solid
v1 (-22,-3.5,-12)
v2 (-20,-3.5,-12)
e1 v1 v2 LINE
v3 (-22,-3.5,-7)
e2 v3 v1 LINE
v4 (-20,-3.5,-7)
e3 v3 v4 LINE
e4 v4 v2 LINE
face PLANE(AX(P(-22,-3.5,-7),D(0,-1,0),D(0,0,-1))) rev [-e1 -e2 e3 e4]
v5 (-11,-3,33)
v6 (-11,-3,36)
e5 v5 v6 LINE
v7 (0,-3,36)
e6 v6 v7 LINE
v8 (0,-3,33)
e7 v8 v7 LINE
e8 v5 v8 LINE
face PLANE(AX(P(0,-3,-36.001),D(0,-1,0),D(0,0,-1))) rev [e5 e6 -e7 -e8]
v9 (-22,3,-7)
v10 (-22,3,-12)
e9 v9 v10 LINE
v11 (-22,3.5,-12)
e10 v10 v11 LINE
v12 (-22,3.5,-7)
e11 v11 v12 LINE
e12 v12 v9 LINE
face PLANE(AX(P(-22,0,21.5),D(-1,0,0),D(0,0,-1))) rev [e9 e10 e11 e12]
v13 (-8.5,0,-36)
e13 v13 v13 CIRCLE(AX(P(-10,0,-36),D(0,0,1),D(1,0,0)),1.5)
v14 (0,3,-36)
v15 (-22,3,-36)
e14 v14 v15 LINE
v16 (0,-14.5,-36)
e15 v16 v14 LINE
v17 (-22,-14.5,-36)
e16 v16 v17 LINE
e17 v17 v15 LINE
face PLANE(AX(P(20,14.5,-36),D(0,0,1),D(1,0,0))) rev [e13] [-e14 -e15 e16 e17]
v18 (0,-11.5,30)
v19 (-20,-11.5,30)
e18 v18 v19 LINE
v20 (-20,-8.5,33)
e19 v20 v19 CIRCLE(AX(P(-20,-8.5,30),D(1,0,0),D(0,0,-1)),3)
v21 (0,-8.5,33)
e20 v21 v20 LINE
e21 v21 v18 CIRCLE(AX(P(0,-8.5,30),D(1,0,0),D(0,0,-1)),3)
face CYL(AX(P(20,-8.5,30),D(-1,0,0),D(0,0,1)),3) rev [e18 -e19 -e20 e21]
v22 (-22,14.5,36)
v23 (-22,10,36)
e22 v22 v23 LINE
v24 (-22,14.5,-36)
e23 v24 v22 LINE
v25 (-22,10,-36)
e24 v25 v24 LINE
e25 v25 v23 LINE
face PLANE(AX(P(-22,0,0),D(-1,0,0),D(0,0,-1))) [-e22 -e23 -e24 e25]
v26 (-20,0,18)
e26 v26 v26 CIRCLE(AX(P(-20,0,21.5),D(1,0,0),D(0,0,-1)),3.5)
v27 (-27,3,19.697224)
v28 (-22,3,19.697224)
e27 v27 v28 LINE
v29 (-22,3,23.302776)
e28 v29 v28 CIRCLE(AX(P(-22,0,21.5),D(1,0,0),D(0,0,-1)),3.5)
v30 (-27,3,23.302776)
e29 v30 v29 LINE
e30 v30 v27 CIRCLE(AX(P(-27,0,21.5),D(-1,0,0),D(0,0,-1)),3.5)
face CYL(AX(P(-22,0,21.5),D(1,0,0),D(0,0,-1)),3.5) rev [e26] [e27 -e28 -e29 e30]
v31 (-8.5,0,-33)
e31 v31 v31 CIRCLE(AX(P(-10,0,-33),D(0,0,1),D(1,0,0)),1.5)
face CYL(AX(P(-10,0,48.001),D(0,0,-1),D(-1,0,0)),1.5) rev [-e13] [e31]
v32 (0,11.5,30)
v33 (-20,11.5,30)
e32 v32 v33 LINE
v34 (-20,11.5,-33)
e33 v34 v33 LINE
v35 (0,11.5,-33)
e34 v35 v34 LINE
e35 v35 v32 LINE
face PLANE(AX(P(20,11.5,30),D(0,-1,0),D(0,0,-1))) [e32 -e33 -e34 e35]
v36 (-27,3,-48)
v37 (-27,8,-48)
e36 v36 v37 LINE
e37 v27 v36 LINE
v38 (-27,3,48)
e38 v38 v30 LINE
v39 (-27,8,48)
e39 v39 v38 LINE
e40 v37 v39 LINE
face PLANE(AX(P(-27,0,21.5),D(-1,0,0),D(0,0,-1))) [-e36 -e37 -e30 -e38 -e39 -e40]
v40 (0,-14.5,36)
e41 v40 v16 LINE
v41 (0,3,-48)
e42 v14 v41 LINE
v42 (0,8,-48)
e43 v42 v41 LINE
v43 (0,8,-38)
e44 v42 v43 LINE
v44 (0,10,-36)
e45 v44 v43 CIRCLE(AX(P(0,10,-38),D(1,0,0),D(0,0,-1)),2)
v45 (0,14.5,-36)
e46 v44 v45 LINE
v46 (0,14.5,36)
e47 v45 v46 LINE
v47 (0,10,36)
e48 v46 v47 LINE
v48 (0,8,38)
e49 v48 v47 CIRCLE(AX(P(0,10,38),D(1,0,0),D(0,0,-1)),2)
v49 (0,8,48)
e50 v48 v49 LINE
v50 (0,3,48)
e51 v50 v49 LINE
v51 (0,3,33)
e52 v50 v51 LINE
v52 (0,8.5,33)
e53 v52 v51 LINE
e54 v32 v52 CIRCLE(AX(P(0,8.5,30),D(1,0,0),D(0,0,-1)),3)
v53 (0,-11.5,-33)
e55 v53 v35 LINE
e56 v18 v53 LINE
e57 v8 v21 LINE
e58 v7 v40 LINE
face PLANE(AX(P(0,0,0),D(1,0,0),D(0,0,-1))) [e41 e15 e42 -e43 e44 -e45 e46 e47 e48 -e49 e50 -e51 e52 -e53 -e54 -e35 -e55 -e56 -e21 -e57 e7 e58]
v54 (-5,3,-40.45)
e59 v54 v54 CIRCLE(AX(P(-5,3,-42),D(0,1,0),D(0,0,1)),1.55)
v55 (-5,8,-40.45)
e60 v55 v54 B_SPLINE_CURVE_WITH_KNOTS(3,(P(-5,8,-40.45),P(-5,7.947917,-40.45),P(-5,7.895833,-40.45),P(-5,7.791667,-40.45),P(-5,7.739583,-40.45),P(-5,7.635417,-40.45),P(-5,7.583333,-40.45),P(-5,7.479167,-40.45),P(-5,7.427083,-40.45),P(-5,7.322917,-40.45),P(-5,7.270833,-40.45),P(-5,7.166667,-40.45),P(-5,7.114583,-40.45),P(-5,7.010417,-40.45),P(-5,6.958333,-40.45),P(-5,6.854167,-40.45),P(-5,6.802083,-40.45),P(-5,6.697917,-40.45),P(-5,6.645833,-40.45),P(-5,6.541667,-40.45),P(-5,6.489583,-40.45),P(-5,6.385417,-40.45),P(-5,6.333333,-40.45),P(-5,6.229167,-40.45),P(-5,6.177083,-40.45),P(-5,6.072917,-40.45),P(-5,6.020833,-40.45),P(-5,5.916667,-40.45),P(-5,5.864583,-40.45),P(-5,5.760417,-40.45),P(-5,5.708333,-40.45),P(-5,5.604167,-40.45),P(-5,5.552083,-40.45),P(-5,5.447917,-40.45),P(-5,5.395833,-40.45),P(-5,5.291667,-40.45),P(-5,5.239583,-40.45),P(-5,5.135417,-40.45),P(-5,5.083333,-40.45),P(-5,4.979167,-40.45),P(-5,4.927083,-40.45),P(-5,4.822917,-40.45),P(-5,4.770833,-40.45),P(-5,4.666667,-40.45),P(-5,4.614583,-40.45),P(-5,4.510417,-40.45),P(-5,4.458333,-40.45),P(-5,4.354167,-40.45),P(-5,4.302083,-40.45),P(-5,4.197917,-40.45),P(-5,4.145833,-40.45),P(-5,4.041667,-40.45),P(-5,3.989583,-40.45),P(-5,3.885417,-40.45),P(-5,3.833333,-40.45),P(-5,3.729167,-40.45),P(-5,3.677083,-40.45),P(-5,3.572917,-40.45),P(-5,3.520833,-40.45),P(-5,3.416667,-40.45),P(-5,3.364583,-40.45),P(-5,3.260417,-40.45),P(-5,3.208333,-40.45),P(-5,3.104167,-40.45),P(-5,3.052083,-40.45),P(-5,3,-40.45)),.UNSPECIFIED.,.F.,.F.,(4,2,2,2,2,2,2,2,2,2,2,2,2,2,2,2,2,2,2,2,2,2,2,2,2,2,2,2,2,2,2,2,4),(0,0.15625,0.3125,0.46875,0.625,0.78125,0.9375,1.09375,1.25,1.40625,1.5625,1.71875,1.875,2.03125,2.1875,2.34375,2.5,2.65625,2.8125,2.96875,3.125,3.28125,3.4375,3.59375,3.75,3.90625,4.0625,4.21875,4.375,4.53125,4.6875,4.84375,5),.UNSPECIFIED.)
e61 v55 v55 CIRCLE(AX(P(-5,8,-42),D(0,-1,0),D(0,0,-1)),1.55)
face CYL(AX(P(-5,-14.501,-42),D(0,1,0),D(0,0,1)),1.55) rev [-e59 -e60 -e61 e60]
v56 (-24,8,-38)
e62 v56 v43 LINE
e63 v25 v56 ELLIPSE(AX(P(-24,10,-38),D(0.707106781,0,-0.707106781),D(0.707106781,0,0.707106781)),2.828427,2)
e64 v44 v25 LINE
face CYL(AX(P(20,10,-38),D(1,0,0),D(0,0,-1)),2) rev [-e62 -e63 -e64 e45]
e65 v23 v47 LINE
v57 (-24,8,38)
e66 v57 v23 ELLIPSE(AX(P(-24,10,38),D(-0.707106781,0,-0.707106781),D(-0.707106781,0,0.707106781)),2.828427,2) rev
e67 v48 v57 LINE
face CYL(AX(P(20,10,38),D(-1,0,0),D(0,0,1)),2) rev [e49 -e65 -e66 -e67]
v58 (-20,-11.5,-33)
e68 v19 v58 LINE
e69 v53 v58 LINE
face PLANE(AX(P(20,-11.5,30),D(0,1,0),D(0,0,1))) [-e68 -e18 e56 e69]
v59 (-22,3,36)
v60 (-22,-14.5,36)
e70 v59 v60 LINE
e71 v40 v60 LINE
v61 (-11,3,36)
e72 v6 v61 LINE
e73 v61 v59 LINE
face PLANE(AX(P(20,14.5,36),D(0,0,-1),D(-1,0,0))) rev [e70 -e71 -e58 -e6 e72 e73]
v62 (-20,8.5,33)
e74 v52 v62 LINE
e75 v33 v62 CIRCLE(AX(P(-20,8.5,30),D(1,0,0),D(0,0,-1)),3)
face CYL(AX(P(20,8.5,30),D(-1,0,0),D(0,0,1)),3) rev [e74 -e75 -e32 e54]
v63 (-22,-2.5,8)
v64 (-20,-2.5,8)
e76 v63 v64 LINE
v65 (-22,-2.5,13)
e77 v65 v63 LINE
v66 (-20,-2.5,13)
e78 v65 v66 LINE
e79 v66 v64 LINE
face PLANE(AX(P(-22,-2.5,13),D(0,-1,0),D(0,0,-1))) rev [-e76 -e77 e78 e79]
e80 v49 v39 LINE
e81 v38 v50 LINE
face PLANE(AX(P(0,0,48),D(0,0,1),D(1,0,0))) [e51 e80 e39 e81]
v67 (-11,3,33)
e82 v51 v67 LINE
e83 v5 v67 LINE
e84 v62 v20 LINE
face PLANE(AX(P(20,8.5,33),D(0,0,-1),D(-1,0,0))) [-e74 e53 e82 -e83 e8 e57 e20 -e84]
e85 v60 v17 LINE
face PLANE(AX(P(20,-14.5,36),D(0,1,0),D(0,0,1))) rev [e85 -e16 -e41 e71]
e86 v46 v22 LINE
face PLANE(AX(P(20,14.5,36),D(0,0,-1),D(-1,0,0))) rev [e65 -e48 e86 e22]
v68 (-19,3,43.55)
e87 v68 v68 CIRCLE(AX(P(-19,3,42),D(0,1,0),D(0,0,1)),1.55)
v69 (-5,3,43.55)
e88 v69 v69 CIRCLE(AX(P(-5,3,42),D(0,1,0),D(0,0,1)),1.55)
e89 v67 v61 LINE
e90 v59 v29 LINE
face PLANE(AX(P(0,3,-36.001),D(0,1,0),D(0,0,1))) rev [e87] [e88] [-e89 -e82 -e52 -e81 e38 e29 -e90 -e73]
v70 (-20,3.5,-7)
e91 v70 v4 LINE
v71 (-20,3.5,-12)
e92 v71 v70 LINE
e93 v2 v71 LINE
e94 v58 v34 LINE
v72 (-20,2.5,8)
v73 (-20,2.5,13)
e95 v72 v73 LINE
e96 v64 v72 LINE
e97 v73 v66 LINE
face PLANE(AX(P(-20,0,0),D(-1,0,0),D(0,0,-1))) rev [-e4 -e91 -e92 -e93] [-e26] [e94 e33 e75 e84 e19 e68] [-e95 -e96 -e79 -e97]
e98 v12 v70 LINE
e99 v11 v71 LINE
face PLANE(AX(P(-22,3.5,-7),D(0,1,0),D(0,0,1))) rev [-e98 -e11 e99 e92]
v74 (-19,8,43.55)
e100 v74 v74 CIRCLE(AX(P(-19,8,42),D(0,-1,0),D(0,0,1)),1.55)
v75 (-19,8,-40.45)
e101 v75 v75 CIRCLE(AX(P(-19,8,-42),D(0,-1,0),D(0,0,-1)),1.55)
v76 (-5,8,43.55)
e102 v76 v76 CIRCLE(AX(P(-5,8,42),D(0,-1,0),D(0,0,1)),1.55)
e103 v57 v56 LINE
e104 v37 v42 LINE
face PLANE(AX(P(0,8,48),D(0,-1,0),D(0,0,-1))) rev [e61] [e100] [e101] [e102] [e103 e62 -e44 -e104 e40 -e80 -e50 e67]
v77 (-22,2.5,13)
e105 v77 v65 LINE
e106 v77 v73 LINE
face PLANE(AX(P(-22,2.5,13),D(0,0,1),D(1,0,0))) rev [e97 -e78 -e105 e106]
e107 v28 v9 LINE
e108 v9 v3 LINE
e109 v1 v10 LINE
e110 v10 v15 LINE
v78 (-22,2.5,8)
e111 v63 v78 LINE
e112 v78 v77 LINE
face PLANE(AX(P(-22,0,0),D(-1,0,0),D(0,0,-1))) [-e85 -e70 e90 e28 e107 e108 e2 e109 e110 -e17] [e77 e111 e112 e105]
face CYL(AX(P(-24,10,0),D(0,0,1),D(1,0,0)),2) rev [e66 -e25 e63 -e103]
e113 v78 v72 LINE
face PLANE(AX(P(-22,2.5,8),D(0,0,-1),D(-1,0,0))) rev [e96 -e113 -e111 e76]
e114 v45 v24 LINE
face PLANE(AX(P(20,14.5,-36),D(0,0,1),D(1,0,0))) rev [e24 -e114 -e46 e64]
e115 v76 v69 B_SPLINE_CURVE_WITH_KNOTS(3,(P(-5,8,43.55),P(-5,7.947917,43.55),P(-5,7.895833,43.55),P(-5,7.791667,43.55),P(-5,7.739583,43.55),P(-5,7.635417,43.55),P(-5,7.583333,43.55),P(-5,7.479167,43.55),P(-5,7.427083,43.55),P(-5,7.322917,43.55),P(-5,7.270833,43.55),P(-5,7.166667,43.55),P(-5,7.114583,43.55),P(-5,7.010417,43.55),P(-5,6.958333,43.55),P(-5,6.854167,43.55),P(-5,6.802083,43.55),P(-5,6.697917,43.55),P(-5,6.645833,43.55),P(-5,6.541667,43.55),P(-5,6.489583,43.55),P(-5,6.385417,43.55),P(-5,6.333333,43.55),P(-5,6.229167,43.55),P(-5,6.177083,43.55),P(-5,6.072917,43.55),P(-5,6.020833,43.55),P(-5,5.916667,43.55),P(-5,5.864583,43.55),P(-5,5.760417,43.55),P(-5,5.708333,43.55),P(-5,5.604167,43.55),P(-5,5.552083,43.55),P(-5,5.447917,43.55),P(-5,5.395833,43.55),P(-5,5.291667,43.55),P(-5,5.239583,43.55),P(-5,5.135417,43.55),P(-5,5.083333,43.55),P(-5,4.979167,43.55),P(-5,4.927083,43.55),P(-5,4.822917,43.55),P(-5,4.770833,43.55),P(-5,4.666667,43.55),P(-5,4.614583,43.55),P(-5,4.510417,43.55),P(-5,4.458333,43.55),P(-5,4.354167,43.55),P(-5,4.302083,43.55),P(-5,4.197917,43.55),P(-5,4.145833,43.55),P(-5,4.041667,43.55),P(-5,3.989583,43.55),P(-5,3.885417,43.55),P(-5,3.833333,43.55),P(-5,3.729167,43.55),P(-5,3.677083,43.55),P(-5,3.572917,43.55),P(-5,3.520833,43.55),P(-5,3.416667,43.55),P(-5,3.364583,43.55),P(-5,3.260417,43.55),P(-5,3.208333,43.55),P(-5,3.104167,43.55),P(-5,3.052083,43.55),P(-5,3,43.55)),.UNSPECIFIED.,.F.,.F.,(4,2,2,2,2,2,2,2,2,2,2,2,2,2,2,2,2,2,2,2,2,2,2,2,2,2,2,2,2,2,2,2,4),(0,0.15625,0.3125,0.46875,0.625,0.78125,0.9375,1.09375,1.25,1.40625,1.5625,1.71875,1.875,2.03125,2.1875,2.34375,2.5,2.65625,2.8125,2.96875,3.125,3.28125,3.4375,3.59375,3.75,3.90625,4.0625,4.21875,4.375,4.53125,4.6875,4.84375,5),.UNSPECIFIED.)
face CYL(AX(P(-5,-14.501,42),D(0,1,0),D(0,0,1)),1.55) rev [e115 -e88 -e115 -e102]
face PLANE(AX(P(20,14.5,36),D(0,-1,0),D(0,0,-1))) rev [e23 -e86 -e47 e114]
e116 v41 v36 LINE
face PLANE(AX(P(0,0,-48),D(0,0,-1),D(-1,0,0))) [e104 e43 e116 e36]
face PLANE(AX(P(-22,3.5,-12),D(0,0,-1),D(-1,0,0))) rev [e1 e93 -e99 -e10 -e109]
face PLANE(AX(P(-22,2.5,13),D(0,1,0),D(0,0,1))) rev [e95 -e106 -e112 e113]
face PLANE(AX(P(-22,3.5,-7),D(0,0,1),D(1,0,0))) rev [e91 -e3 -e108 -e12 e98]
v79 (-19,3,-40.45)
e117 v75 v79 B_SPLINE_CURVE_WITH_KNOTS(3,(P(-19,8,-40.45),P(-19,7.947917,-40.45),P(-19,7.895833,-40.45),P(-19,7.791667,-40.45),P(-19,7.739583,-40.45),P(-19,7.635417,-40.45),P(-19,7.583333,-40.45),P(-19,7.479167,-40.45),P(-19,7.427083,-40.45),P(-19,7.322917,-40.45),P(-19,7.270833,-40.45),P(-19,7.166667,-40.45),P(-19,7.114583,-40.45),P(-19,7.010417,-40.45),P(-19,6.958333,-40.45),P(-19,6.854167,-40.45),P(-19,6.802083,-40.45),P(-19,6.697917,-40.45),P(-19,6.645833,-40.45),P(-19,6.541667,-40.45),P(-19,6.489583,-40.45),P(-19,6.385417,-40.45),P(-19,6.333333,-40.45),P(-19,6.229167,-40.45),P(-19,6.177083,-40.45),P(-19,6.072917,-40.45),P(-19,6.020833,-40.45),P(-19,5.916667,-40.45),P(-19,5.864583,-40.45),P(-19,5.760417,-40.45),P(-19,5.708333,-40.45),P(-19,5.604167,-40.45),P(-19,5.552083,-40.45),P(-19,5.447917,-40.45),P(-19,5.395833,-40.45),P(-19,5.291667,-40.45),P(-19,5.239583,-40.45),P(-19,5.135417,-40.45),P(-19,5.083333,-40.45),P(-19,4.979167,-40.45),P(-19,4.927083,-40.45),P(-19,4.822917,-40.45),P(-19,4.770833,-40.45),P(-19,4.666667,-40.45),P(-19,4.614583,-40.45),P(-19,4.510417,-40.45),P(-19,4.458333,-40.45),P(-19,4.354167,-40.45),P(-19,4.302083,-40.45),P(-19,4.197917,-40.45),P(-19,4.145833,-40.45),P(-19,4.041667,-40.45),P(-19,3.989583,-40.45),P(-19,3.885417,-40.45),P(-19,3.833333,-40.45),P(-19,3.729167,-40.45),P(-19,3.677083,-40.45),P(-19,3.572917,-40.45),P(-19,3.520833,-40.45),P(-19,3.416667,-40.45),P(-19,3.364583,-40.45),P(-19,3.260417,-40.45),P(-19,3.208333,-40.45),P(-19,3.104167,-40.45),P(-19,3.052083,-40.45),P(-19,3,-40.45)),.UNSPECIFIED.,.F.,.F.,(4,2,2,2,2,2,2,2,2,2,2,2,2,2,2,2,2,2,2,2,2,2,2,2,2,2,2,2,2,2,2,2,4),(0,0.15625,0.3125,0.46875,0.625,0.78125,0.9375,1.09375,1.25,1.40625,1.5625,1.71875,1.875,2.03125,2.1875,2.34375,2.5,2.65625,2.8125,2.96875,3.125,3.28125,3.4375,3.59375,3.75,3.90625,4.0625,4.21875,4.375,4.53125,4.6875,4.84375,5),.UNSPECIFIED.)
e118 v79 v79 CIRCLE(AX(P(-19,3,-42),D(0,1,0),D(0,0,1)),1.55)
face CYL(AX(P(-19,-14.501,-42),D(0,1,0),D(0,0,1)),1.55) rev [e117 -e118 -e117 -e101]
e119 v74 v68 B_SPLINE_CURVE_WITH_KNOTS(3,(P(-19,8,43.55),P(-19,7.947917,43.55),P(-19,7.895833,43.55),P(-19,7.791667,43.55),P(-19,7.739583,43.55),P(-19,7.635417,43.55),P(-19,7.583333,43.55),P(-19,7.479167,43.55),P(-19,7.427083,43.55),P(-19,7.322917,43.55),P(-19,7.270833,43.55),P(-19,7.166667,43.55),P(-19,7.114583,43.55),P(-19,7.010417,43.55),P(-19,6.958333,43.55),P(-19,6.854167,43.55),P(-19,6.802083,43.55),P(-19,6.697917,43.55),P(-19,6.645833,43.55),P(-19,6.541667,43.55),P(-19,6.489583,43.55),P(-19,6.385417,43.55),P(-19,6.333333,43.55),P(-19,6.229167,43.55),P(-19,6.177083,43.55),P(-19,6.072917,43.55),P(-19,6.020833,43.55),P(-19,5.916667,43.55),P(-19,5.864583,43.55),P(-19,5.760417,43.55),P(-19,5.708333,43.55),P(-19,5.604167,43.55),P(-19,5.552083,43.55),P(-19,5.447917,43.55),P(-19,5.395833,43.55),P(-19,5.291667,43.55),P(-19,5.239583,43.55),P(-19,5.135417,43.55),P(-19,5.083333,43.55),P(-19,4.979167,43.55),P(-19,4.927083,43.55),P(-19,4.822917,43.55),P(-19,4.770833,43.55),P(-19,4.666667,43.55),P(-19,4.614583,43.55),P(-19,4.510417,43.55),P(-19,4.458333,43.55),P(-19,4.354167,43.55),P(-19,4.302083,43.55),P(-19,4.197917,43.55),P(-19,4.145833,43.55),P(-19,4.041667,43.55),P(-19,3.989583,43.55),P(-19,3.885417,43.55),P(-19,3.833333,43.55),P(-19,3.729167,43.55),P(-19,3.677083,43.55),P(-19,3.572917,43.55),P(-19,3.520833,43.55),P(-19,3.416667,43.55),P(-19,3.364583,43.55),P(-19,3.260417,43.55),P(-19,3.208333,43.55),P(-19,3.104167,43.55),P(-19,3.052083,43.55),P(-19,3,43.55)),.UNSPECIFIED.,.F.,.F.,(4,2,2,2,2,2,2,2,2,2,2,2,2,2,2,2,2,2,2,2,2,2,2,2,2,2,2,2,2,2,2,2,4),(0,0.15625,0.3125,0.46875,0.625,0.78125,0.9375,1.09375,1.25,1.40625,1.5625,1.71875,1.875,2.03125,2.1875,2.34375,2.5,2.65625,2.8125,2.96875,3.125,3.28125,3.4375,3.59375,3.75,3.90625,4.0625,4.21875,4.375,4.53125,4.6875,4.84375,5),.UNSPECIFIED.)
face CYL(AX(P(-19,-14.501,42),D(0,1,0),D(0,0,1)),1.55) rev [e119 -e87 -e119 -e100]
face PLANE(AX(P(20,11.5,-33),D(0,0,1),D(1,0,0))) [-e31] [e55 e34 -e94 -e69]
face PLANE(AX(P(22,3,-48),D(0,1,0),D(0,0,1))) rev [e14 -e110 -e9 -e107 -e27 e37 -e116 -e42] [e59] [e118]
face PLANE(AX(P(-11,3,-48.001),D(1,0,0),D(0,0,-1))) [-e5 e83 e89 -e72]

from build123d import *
from build123d.topology import SkipClean

# Parameters (mm, degrees)
SKETCH_1_W             = 72
SKETCH_1_H             = 29
EXTRUDE_1_DEPTH        = 20
CUT_EXTRUDE_1_REACH    = 78.12
SKETCH_2_W             = 11
SKETCH_2_H             = 6
CUT_EXTRUDE_2_REACH    = 78.12
SKETCH_3_R             = 1.5
SKETCH_4_W             = 72
SKETCH_4_H             = 29
SKETCH_4_R             = 3.5
SKETCH_4_W_2           = 5
SKETCH_4_H_2           = 5
SKETCH_4_H_3           = 7
EXTRUDE_2_DEPTH        = 2
SKETCH_6_W             = 22
SKETCH_6_H             = 5
EXTRUDE_3_DEPTH        = 12
SKETCH_7_W             = 22
SKETCH_7_H             = 5
EXTRUDE_4_DEPTH        = 12
EXTRUDE_5_DEPTH        = 5
CUT_EXTRUDE_4_REACH    = 61.492
SKETCH_10_R            = 1.55
FILLET_1_R             = 2
FILLET_1_OF_MIRROR_4_R = 2
SKETCH_11_W            = 152.939509244
SKETCH_11_H            = 68.45292135
CUT_EXTRUDE_5_DEPTH    = 27


with BuildPart() as part:
    # 草圖1 → 填料-伸長1 (new body)
    with BuildSketch(Plane(origin=(0, 0, 0), x_dir=(0, 0, -1), z_dir=(1, 0, 0))):
        Rectangle(SKETCH_1_W, SKETCH_1_H)
        with BuildLine():
            Line((-30, 11.5), (33, 11.5))
            Line((33, 11.5), (33, -11.5))
            Line((33, -11.5), (-30, -11.5))
            ThreePointArc((-30, -11.5), (-32.121320344, -10.621320344), (-33, -8.5))
            Line((-33, -8.5), (-33, 8.5))
            ThreePointArc((-33, 8.5), (-32.121320344, 10.621320344), (-30, 11.5))
        make_face(mode=Mode.SUBTRACT)
    extrude_1 = extrude(amount=EXTRUDE_1_DEPTH)

    # 草圖2 → 除料-伸長1 (cut, up to next)
    with BuildSketch(Plane.XY.offset(36), mode=Mode.PRIVATE) as cut_extrude_1_sk1:
        with Locations((5.5, 0)):
            Rectangle(SKETCH_2_W, SKETCH_2_H)
    cut_extrude_1_tool1 = extrude(cut_extrude_1_sk1.sketch, amount=-CUT_EXTRUDE_1_REACH, mode=Mode.PRIVATE) & part.part
    cut_extrude_1 = cut_extrude_1_tool1.solids().sort_by_distance((5.5, 0, 36))[0]
    add(cut_extrude_1, mode=Mode.SUBTRACT)

    # 草圖3 → 除料-伸長2 (cut, up to next)
    with BuildSketch(Plane(origin=(0, 0, -36), x_dir=(-1, 0, 0), z_dir=(0, 0, -1)), mode=Mode.PRIVATE) as cut_extrude_2_sk1:
        with Locations((-10, 0)):
            Circle(SKETCH_3_R)
    cut_extrude_2_tool1 = extrude(cut_extrude_2_sk1.sketch, amount=-CUT_EXTRUDE_2_REACH, mode=Mode.PRIVATE) & part.part
    cut_extrude_2 = cut_extrude_2_tool1.solids().sort_by_distance((10, 0, -36))[0]
    add(cut_extrude_2, mode=Mode.SUBTRACT)

    # 草圖4 → 填料-伸長2 (add)
    with BuildSketch(Plane(origin=(20, 0, 0), x_dir=(0, 0, -1), z_dir=(1, 0, 0))):
        Rectangle(SKETCH_4_W, SKETCH_4_H)
        with Locations((-21.5, 0)):
            Circle(SKETCH_4_R, mode=Mode.SUBTRACT)
        with Locations((-10.5, 0)):
            Rectangle(SKETCH_4_W_2, SKETCH_4_H_2, mode=Mode.SUBTRACT)
        with Locations((9.5, 0)):
            Rectangle(SKETCH_4_W_2, SKETCH_4_H_3, mode=Mode.SUBTRACT)
    extrude_2 = extrude(amount=EXTRUDE_2_DEPTH)

    # 草圖6 → 填料-伸長3 (add)
    with BuildSketch(Plane.XY.offset(36)):
        with Locations((11, 5.5)):
            Rectangle(SKETCH_6_W, SKETCH_6_H)
    extrude_3 = extrude(amount=EXTRUDE_3_DEPTH)

    # 草圖7 → 填料-伸長4 (add)
    with BuildSketch(Plane(origin=(0, 0, -36), x_dir=(-1, 0, 0), z_dir=(0, 0, -1))):
        with Locations((-11, 5.5)):
            Rectangle(SKETCH_7_W, SKETCH_7_H)
    extrude_4 = extrude(amount=EXTRUDE_4_DEPTH)

    # 草圖9 → 填料-伸長5 (add)
    with SkipClean():  # the faces are left unmerged after this step: merging them gives an invalid solid
        with BuildSketch(Plane(origin=(22, 0, 0), x_dir=(0, 0, -1), z_dir=(1, 0, 0))):
            with BuildLine():
                Line((-48, 3), (-23.302775638, 3))
                ThreePointArc((-23.302775638, 3), (-21.5, 3.5), (-19.697224362, 3))
                Line((-19.697224362, 3), (48, 3))
                Line((48, 3), (48, 8))
                Line((48, 8), (-48, 8))
                Line((-48, 8), (-48, 3))
            make_face()
        extrude_5 = extrude(amount=EXTRUDE_5_DEPTH)

    # 草圖10 → 除料-伸長4 (cut, up to next)
    with BuildSketch(Plane(origin=(0, 8, 0), x_dir=(1, 0, 0), z_dir=(0, 1, 0)), mode=Mode.PRIVATE) as cut_extrude_4_sk1:
        with Locations(Location((5, -42, 0), (0, 0, 270))):
            Circle(SKETCH_10_R)
    cut_extrude_4_tool1 = extrude(cut_extrude_4_sk1.sketch, amount=-CUT_EXTRUDE_4_REACH, mode=Mode.PRIVATE) & part.part
    # 草圖10 → 除料-伸長4 (cut, up to next)
    with BuildSketch(Plane(origin=(0, 8, 0), x_dir=(1, 0, 0), z_dir=(0, 1, 0)), mode=Mode.PRIVATE) as cut_extrude_4_sk2:
        with Locations(Location((19, -42, 0), (0, 0, 270))):
            Circle(SKETCH_10_R)
    cut_extrude_4_tool2 = extrude(cut_extrude_4_sk2.sketch, amount=-CUT_EXTRUDE_4_REACH, mode=Mode.PRIVATE) & part.part
    # 草圖10 → 除料-伸長4 (cut, up to next)
    with BuildSketch(Plane(origin=(0, 8, 0), x_dir=(1, 0, 0), z_dir=(0, 1, 0)), mode=Mode.PRIVATE) as cut_extrude_4_sk3:
        with Locations(Location((19, 42, 0), (0, 0, 270))):
            Circle(SKETCH_10_R)
    cut_extrude_4_tool3 = extrude(cut_extrude_4_sk3.sketch, amount=-CUT_EXTRUDE_4_REACH, mode=Mode.PRIVATE) & part.part
    # 草圖10 → 除料-伸長4 (cut, up to next)
    with BuildSketch(Plane(origin=(0, 8, 0), x_dir=(1, 0, 0), z_dir=(0, 1, 0)), mode=Mode.PRIVATE) as cut_extrude_4_sk4:
        with Locations(Location((5, 42, 0), (0, 0, 270))):
            Circle(SKETCH_10_R)
    cut_extrude_4_tool4 = extrude(cut_extrude_4_sk4.sketch, amount=-CUT_EXTRUDE_4_REACH, mode=Mode.PRIVATE) & part.part
    cut_extrude_4_1 = cut_extrude_4_tool1.solids().sort_by_distance((5, 8, 42))[0]
    add(cut_extrude_4_1, mode=Mode.SUBTRACT)
    cut_extrude_4_2 = cut_extrude_4_tool2.solids().sort_by_distance((19, 8, 42))[0]
    add(cut_extrude_4_2, mode=Mode.SUBTRACT)
    cut_extrude_4_3 = cut_extrude_4_tool3.solids().sort_by_distance((19, 8, -42))[0]
    add(cut_extrude_4_3, mode=Mode.SUBTRACT)
    cut_extrude_4_4 = cut_extrude_4_tool4.solids().sort_by_distance((5, 8, -42))[0]
    add(cut_extrude_4_4, mode=Mode.SUBTRACT)
    cut_extrude_4 = cut_extrude_4_1 + cut_extrude_4_2 + cut_extrude_4_3 + cut_extrude_4_4  # 除料-伸長4 as one shape, for the pattern or mirror that repeats it

    # 圓角1
    # the kernel refuses this fillet: 2 mm, written as the material it adds along each edge
    with BuildSketch(Plane(origin=(22, 8, -36), x_dir=(0, 1, 0), z_dir=(-1, 0, 0)), Plane(origin=(0, 8, 36), x_dir=(0, 1, 0), z_dir=(1, 0, 0))) as fillet_1_piece_1:
        with BuildLine():
            CenterArc((FILLET_1_R, FILLET_1_R), FILLET_1_R, 180, 90)
            Line((0, FILLET_1_R), (0, 0))
            Line((0, 0), (FILLET_1_R, 0))
        make_face()
    extrude(amount=22)
    with BuildSketch(Plane(origin=(22, 8, -36), x_dir=(0, 1, 0), z_dir=(0, 0, 1))) as fillet_1_piece_2:
        with BuildLine():
            CenterArc((FILLET_1_R, -FILLET_1_R), FILLET_1_R, 90, 90)
            Line((0, -FILLET_1_R), (0, 0))
            Line((0, 0), (FILLET_1_R, 0))
        make_face()
    extrude(amount=72)
    with BuildSketch(Plane(origin=(22, 8, -41), x_dir=(0, 1, 0), z_dir=(0, 0, 1))) as fillet_1_piece_3a_section:
        with BuildLine():
            CenterArc((FILLET_1_R, -FILLET_1_R), FILLET_1_R, 90, 90)
            Line((0, -FILLET_1_R), (0, 0))
            Line((0, 0), (FILLET_1_R, 0))
        make_face()
    fillet_1_piece_3a = extrude(amount=77, mode=Mode.PRIVATE)
    fillet_1_piece_3a = split(fillet_1_piece_3a, bisect_by=Plane(origin=(22.452790229, 8.452790229, -36), z_dir=(0, 0, -1)), keep=Keep.TOP, mode=Mode.PRIVATE)
    with BuildSketch(Plane(origin=(27, 8, -36), x_dir=(0, 1, 0), z_dir=(-1, 0, 0))) as fillet_1_piece_3b_section:
        with BuildLine():
            CenterArc((FILLET_1_R, FILLET_1_R), FILLET_1_R, 180, 90)
            Line((0, FILLET_1_R), (0, 0))
            Line((0, 0), (FILLET_1_R, 0))
        make_face()
    fillet_1_piece_3b = extrude(amount=27, mode=Mode.PRIVATE)
    fillet_1_piece_3b = split(fillet_1_piece_3b, bisect_by=Plane(origin=(22, 8.452790229, -36.452790229), z_dir=(1, 0, 0)), keep=Keep.TOP, mode=Mode.PRIVATE)
    fillet_1_piece_3 = fillet_1_piece_3a & fillet_1_piece_3b
    add(fillet_1_piece_3)
    with BuildSketch(Plane(origin=(0, 8, 36), x_dir=(0, 1, 0), z_dir=(1, 0, 0))) as fillet_1_piece_4a_section:
        with BuildLine():
            CenterArc((FILLET_1_R, FILLET_1_R), FILLET_1_R, 180, 90)
            Line((0, FILLET_1_R), (0, 0))
            Line((0, 0), (FILLET_1_R, 0))
        make_face()
    fillet_1_piece_4a = extrude(amount=27, mode=Mode.PRIVATE)
    fillet_1_piece_4a = split(fillet_1_piece_4a, bisect_by=Plane(origin=(22, 8.452790229, 36.452790229), z_dir=(1, 0, 0)), keep=Keep.TOP, mode=Mode.PRIVATE)
    with BuildSketch(Plane(origin=(22, 8, -36), x_dir=(0, 1, 0), z_dir=(0, 0, 1))) as fillet_1_piece_4b_section:
        with BuildLine():
            CenterArc((FILLET_1_R, -FILLET_1_R), FILLET_1_R, 90, 90)
            Line((0, -FILLET_1_R), (0, 0))
            Line((0, 0), (FILLET_1_R, 0))
        make_face()
    fillet_1_piece_4b = extrude(amount=77, mode=Mode.PRIVATE)
    fillet_1_piece_4b = split(fillet_1_piece_4b, bisect_by=Plane(origin=(22.452790229, 8.452790229, 36), z_dir=(0, 0, 1)), keep=Keep.TOP, mode=Mode.PRIVATE)
    fillet_1_piece_4 = fillet_1_piece_4a & fillet_1_piece_4b
    add(fillet_1_piece_4)

    # 鏡射4: 填料-伸長1, 除料-伸長1, 除料-伸長2, 填料-伸長2, 填料-伸長3, 填料-伸長4, 填料-伸長5, 除料-伸長4 across plane
    add(extrude_1.mirror(Plane.ZY))
    add(cut_extrude_1.mirror(Plane.ZY), mode=Mode.SUBTRACT)
    add(cut_extrude_2.mirror(Plane.ZY), mode=Mode.SUBTRACT)
    add(extrude_2.mirror(Plane.ZY))
    add(extrude_3.mirror(Plane.ZY))
    add(extrude_4.mirror(Plane.ZY))
    add(extrude_5.mirror(Plane.ZY))
    add(cut_extrude_4.mirror(Plane.ZY), mode=Mode.SUBTRACT)

    # 圓角1 of 鏡射4
    # the kernel refuses this fillet: 2 mm, written as the material it adds along each edge
    with BuildSketch(Plane(origin=(-22, 8, -36), x_dir=(0, 0, -1), z_dir=(1, 0, 0))) as fillet_1_of_mirror_4_piece_1:
        with BuildLine():
            CenterArc((FILLET_1_OF_MIRROR_4_R, FILLET_1_OF_MIRROR_4_R), FILLET_1_OF_MIRROR_4_R, 180, 90)
            Line((0, FILLET_1_OF_MIRROR_4_R), (0, 0))
            Line((0, 0), (FILLET_1_OF_MIRROR_4_R, 0))
        make_face()
    extrude(amount=27)
    with BuildSketch(Plane(origin=(-22, 8, -36), x_dir=(-1, 0, 0), z_dir=(0, 0, 1))) as fillet_1_of_mirror_4_piece_2:
        with BuildLine():
            CenterArc((FILLET_1_OF_MIRROR_4_R, -FILLET_1_OF_MIRROR_4_R), FILLET_1_OF_MIRROR_4_R, 90, 90)
            Line((0, -FILLET_1_OF_MIRROR_4_R), (0, 0))
            Line((0, 0), (FILLET_1_OF_MIRROR_4_R, 0))
        make_face()
    extrude(amount=72)
    with BuildSketch(Plane(origin=(5, 8, 36), x_dir=(0, 1, 0), z_dir=(-1, 0, 0))) as fillet_1_of_mirror_4_piece_3:
        with BuildLine():
            CenterArc((FILLET_1_OF_MIRROR_4_R, -FILLET_1_OF_MIRROR_4_R), FILLET_1_OF_MIRROR_4_R, 90, 90)
            Line((0, -FILLET_1_OF_MIRROR_4_R), (0, 0))
            Line((0, 0), (FILLET_1_OF_MIRROR_4_R, 0))
        make_face()
    extrude(amount=27)
    with BuildSketch(Plane(origin=(-22, 8, -41), x_dir=(-1, 0, 0), z_dir=(0, 0, 1))) as fillet_1_of_mirror_4_piece_4a_section:
        with BuildLine():
            CenterArc((FILLET_1_OF_MIRROR_4_R, -FILLET_1_OF_MIRROR_4_R), FILLET_1_OF_MIRROR_4_R, 90, 90)
            Line((0, -FILLET_1_OF_MIRROR_4_R), (0, 0))
            Line((0, 0), (FILLET_1_OF_MIRROR_4_R, 0))
        make_face()
    fillet_1_of_mirror_4_piece_4a = extrude(amount=77, mode=Mode.PRIVATE)
    fillet_1_of_mirror_4_piece_4a = split(fillet_1_of_mirror_4_piece_4a, bisect_by=Plane(origin=(-22.452790229, 8.452790229, -36), z_dir=(0, 0, -1)), keep=Keep.TOP, mode=Mode.PRIVATE)
    with BuildSketch(Plane(origin=(-27, 8, -36), x_dir=(0, 0, -1), z_dir=(1, 0, 0))) as fillet_1_of_mirror_4_piece_4b_section:
        with BuildLine():
            CenterArc((FILLET_1_OF_MIRROR_4_R, FILLET_1_OF_MIRROR_4_R), FILLET_1_OF_MIRROR_4_R, 180, 90)
            Line((0, FILLET_1_OF_MIRROR_4_R), (0, 0))
            Line((0, 0), (FILLET_1_OF_MIRROR_4_R, 0))
        make_face()
    fillet_1_of_mirror_4_piece_4b = extrude(amount=27, mode=Mode.PRIVATE)
    fillet_1_of_mirror_4_piece_4b = split(fillet_1_of_mirror_4_piece_4b, bisect_by=Plane(origin=(-22, 8.452790229, -36.452790229), z_dir=(-1, 0, 0)), keep=Keep.TOP, mode=Mode.PRIVATE)
    fillet_1_of_mirror_4_piece_4 = fillet_1_of_mirror_4_piece_4a & fillet_1_of_mirror_4_piece_4b
    add(fillet_1_of_mirror_4_piece_4)
    with BuildSketch(Plane(origin=(0, 8, 36), x_dir=(0, 1, 0), z_dir=(-1, 0, 0))) as fillet_1_of_mirror_4_piece_5a_section:
        with BuildLine():
            CenterArc((FILLET_1_OF_MIRROR_4_R, -FILLET_1_OF_MIRROR_4_R), FILLET_1_OF_MIRROR_4_R, 90, 90)
            Line((0, -FILLET_1_OF_MIRROR_4_R), (0, 0))
            Line((0, 0), (FILLET_1_OF_MIRROR_4_R, 0))
        make_face()
    fillet_1_of_mirror_4_piece_5a = extrude(amount=27, mode=Mode.PRIVATE)
    fillet_1_of_mirror_4_piece_5a = split(fillet_1_of_mirror_4_piece_5a, bisect_by=Plane(origin=(-22, 8.452790229, 36.452790229), z_dir=(-1, 0, 0)), keep=Keep.TOP, mode=Mode.PRIVATE)
    with BuildSketch(Plane(origin=(-22, 8, -36), x_dir=(-1, 0, 0), z_dir=(0, 0, 1))) as fillet_1_of_mirror_4_piece_5b_section:
        with BuildLine():
            CenterArc((FILLET_1_OF_MIRROR_4_R, -FILLET_1_OF_MIRROR_4_R), FILLET_1_OF_MIRROR_4_R, 90, 90)
            Line((0, -FILLET_1_OF_MIRROR_4_R), (0, 0))
            Line((0, 0), (FILLET_1_OF_MIRROR_4_R, 0))
        make_face()
    fillet_1_of_mirror_4_piece_5b = extrude(amount=77, mode=Mode.PRIVATE)
    fillet_1_of_mirror_4_piece_5b = split(fillet_1_of_mirror_4_piece_5b, bisect_by=Plane(origin=(-22.452790229, 8.452790229, 36), z_dir=(0, 0, 1)), keep=Keep.TOP, mode=Mode.PRIVATE)
    fillet_1_of_mirror_4_piece_5 = fillet_1_of_mirror_4_piece_5a & fillet_1_of_mirror_4_piece_5b
    add(fillet_1_of_mirror_4_piece_5)

    # 草圖11 → 除料-伸長5 (cut)
    with BuildSketch(Plane.ZY):
        with Locations((0.508783228, -2.026988218)):
            Rectangle(SKETCH_11_W, SKETCH_11_H)
    extrude(amount=-CUT_EXTRUDE_5_DEPTH, mode=Mode.SUBTRACT)


solid = part.part
